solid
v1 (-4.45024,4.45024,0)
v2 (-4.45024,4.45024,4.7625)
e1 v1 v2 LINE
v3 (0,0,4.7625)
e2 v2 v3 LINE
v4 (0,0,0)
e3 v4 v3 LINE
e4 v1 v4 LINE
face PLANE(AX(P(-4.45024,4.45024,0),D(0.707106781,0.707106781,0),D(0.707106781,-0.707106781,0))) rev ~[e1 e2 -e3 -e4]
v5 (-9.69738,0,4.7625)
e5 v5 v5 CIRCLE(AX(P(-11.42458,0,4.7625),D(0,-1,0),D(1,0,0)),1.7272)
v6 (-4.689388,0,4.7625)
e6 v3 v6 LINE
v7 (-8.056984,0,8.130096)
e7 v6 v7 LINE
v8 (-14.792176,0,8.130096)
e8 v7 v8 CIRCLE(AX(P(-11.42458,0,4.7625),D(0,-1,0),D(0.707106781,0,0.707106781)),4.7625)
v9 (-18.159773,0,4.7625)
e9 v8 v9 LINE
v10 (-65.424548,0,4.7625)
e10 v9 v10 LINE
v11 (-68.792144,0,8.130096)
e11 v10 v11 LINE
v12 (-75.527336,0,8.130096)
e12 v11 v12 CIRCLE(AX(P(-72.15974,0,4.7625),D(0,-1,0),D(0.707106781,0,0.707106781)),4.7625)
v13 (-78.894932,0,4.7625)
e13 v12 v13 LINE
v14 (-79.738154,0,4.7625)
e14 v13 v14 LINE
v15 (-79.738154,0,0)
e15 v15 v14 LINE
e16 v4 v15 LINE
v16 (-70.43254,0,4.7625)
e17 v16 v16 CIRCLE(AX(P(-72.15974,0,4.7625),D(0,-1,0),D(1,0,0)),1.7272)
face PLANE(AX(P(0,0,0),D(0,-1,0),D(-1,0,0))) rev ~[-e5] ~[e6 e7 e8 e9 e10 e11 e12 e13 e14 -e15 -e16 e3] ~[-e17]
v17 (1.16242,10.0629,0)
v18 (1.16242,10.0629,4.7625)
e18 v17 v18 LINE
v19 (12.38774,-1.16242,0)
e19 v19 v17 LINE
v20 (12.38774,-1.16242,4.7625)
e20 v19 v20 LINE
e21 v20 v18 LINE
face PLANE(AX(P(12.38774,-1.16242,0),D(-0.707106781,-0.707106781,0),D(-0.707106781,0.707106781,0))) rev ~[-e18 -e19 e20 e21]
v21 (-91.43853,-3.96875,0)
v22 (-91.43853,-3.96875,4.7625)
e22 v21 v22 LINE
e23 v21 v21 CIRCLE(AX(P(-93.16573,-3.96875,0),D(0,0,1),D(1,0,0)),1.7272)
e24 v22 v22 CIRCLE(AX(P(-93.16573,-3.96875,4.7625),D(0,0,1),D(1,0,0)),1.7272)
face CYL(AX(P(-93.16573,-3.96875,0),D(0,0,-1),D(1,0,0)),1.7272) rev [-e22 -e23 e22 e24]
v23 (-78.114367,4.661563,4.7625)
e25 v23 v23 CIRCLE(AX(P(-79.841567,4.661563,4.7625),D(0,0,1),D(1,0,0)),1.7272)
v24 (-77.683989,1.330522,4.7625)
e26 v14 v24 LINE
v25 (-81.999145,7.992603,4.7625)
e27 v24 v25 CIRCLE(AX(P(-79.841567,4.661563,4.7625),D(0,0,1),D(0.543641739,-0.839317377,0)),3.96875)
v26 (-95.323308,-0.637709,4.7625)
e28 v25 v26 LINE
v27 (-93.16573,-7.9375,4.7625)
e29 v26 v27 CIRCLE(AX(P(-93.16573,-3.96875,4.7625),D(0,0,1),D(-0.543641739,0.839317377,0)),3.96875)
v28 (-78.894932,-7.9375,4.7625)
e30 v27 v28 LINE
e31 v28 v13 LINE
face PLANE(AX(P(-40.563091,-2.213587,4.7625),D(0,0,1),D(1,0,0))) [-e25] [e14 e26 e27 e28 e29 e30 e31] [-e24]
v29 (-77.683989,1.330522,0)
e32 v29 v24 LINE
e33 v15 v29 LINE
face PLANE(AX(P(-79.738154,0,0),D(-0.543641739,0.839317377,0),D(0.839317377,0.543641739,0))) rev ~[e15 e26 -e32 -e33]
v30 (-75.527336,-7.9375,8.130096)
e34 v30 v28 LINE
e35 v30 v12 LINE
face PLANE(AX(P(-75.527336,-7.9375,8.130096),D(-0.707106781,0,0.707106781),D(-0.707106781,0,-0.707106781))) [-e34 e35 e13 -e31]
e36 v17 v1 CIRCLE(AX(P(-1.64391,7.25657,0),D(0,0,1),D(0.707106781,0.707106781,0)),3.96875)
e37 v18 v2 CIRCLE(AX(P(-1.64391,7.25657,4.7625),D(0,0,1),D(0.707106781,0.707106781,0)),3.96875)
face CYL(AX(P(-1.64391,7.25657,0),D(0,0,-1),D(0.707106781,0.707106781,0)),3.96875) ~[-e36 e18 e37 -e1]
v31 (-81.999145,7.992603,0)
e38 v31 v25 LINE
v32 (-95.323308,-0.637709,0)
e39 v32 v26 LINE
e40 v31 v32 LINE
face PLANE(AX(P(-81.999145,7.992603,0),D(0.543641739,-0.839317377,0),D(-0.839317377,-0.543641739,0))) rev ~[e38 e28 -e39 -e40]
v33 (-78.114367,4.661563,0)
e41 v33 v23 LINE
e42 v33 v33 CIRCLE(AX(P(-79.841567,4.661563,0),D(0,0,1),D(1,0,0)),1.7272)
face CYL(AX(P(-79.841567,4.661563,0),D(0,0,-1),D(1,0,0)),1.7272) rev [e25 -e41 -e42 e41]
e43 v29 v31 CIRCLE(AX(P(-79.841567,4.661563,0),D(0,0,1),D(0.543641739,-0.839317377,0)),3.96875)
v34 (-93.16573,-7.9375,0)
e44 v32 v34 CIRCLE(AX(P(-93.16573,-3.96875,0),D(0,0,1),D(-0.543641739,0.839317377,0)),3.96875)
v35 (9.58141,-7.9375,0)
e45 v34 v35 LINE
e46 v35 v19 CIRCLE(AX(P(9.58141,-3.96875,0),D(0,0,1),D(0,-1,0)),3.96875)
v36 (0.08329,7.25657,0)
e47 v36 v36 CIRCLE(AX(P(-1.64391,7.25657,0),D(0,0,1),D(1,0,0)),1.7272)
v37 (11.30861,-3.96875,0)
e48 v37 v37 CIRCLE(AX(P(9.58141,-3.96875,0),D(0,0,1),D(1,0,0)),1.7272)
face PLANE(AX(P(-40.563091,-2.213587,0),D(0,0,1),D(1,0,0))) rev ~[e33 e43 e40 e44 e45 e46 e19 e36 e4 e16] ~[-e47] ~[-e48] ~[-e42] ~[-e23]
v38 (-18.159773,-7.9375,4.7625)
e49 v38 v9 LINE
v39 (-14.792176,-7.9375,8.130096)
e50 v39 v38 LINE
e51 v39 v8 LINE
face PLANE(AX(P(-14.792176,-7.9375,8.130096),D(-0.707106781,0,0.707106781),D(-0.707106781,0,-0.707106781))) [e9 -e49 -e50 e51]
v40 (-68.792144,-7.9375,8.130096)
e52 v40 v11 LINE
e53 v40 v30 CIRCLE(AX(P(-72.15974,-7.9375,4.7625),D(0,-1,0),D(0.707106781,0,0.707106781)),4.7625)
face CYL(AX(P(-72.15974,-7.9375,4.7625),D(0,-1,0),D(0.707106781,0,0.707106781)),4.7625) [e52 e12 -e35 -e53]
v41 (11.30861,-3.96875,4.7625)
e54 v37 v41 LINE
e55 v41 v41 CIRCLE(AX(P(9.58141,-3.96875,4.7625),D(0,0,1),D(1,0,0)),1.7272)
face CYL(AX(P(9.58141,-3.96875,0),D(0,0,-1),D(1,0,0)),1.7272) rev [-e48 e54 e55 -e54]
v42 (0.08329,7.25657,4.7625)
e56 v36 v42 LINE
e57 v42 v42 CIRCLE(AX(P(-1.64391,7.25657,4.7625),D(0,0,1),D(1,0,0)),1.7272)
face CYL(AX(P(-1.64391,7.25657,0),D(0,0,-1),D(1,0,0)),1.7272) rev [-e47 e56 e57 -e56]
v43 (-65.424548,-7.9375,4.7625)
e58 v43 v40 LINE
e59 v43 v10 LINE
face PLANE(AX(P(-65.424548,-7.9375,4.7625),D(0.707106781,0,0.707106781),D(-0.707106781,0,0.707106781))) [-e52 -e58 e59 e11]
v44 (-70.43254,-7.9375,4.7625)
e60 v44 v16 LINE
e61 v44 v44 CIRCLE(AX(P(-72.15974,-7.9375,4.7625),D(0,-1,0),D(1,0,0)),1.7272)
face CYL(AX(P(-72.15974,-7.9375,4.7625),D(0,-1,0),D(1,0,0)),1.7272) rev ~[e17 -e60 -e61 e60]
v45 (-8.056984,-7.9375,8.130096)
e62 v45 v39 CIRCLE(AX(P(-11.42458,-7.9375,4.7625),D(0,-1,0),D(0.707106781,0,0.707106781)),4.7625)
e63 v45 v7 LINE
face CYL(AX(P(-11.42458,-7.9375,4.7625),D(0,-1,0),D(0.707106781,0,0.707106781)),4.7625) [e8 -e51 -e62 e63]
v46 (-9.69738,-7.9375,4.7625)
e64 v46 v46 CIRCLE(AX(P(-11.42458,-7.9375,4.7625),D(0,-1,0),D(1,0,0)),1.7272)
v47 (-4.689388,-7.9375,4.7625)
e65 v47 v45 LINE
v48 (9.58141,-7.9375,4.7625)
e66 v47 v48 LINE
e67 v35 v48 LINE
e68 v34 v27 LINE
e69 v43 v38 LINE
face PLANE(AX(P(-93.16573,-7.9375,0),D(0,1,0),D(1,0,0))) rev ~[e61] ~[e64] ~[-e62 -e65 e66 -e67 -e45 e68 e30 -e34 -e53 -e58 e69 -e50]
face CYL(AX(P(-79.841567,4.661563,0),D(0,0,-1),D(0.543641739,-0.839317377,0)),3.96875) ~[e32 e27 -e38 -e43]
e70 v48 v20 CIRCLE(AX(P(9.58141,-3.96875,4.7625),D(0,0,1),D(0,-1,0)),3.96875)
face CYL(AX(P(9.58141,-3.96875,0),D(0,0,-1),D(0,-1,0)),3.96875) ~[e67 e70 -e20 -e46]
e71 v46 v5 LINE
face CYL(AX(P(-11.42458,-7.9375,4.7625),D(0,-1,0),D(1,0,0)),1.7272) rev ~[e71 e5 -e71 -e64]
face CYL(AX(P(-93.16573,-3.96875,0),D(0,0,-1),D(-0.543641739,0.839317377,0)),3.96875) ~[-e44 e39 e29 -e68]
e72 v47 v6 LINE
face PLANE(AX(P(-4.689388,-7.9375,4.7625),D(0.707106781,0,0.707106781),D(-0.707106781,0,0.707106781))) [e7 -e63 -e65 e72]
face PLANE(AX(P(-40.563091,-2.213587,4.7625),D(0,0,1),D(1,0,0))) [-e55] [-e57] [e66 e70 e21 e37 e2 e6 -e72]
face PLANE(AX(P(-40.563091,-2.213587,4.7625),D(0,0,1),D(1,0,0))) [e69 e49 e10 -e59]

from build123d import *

# Parameters (mm, degrees)
F0_R     = 1.7272
F1_DEPTH = 4.7625
F3_DEPTH = 7.9375
F4_R     = 1.7272
F5_DEPTH = 7.9375


with BuildPart() as f1:
    # F0 (on Top) → F1 (new body)
    with BuildSketch(Plane.XY):
        with BuildLine():
            Line((-4.4502401135, 4.4502401135), (0, 0))
            Line((0, 0), (-79.7381539824, 0))
            Line((-79.7381539824, 0), (-77.6839886087, 1.3305217617))
            ThreePointArc((-77.6839886087, 1.3305217617), (-76.5105259182, 6.8191407537), (-81.9991449101, 7.9926034442))
            Line((-81.9991449101, 7.9926034442), (-95.3233082751, -0.6377091588))
            ThreePointArc((-95.3233082751, -0.6377091588), (-96.9717152071, -5.0936740472), (-93.1657301243, -7.9375))
            Line((-93.1657301243, -7.9375), (9.5814100757, -7.9375))
            ThreePointArc((9.5814100757, -7.9375), (13.2480569703, -5.4875248722), (12.3877401135, -1.1624199622))
            Line((12.3877401135, -1.1624199622), (1.1624199622, 10.0629001892))
            ThreePointArc((1.1624199622, 10.0629001892), (-4.4502401135, 10.0629001892), (-4.4502401135, 4.4502401135))
        make_face()
        with Locations((-93.1657301243, -3.96875)):
            Circle(F0_R, mode=Mode.SUBTRACT)
        with Locations((9.5814100757, -3.96875)):
            Circle(F0_R, mode=Mode.SUBTRACT)
        with Locations((-79.8415667594, 4.661562603)):
            Circle(F0_R, mode=Mode.SUBTRACT)
        with Locations((-1.6439100757, 7.2565701513)):
            Circle(F0_R, mode=Mode.SUBTRACT)
    extrude(amount=F1_DEPTH)

    # F2 (on face) → F3 (join, through all)
    with BuildSketch(Plane.XZ.offset(7.9375)):
        with BuildLine():
            Line((-78.8949317151, 4.7625), (-72.1597396243, 4.7625))
            Line((-72.1597396243, 4.7625), (-65.4245475335, 4.7625))
            Line((-65.4245475335, 4.7625), (-68.7921435789, 8.1300960454))
            ThreePointArc((-68.7921435789, 8.1300960454), (-72.1597396243, 9.525), (-75.5273356697, 8.1300960454))
            Line((-75.5273356697, 8.1300960454), (-78.8949317151, 4.7625))
        make_face()
        with BuildLine():
            Line((-18.1597725151, 4.7625), (-11.4245804243, 4.7625))
            Line((-11.4245804243, 4.7625), (-4.6893883335, 4.7625))
            Line((-4.6893883335, 4.7625), (-8.0569843789, 8.1300960454))
            ThreePointArc((-8.0569843789, 8.1300960454), (-11.4245804243, 9.525), (-14.7921764697, 8.1300960454))
            Line((-14.7921764697, 8.1300960454), (-18.1597725151, 4.7625))
        make_face()
    extrude(amount=-F3_DEPTH)

    # F4 (on face) → F5 (cut, through all)
    with BuildSketch(Plane.XZ.offset(7.9375)):
        with Locations((-72.1597396243, 4.7625)):
            Circle(F4_R)
        with Locations((-11.4245804243, 4.7625)):
            Circle(F4_R)
    extrude(amount=-F5_DEPTH, mode=Mode.SUBTRACT)


solid = f1.part
